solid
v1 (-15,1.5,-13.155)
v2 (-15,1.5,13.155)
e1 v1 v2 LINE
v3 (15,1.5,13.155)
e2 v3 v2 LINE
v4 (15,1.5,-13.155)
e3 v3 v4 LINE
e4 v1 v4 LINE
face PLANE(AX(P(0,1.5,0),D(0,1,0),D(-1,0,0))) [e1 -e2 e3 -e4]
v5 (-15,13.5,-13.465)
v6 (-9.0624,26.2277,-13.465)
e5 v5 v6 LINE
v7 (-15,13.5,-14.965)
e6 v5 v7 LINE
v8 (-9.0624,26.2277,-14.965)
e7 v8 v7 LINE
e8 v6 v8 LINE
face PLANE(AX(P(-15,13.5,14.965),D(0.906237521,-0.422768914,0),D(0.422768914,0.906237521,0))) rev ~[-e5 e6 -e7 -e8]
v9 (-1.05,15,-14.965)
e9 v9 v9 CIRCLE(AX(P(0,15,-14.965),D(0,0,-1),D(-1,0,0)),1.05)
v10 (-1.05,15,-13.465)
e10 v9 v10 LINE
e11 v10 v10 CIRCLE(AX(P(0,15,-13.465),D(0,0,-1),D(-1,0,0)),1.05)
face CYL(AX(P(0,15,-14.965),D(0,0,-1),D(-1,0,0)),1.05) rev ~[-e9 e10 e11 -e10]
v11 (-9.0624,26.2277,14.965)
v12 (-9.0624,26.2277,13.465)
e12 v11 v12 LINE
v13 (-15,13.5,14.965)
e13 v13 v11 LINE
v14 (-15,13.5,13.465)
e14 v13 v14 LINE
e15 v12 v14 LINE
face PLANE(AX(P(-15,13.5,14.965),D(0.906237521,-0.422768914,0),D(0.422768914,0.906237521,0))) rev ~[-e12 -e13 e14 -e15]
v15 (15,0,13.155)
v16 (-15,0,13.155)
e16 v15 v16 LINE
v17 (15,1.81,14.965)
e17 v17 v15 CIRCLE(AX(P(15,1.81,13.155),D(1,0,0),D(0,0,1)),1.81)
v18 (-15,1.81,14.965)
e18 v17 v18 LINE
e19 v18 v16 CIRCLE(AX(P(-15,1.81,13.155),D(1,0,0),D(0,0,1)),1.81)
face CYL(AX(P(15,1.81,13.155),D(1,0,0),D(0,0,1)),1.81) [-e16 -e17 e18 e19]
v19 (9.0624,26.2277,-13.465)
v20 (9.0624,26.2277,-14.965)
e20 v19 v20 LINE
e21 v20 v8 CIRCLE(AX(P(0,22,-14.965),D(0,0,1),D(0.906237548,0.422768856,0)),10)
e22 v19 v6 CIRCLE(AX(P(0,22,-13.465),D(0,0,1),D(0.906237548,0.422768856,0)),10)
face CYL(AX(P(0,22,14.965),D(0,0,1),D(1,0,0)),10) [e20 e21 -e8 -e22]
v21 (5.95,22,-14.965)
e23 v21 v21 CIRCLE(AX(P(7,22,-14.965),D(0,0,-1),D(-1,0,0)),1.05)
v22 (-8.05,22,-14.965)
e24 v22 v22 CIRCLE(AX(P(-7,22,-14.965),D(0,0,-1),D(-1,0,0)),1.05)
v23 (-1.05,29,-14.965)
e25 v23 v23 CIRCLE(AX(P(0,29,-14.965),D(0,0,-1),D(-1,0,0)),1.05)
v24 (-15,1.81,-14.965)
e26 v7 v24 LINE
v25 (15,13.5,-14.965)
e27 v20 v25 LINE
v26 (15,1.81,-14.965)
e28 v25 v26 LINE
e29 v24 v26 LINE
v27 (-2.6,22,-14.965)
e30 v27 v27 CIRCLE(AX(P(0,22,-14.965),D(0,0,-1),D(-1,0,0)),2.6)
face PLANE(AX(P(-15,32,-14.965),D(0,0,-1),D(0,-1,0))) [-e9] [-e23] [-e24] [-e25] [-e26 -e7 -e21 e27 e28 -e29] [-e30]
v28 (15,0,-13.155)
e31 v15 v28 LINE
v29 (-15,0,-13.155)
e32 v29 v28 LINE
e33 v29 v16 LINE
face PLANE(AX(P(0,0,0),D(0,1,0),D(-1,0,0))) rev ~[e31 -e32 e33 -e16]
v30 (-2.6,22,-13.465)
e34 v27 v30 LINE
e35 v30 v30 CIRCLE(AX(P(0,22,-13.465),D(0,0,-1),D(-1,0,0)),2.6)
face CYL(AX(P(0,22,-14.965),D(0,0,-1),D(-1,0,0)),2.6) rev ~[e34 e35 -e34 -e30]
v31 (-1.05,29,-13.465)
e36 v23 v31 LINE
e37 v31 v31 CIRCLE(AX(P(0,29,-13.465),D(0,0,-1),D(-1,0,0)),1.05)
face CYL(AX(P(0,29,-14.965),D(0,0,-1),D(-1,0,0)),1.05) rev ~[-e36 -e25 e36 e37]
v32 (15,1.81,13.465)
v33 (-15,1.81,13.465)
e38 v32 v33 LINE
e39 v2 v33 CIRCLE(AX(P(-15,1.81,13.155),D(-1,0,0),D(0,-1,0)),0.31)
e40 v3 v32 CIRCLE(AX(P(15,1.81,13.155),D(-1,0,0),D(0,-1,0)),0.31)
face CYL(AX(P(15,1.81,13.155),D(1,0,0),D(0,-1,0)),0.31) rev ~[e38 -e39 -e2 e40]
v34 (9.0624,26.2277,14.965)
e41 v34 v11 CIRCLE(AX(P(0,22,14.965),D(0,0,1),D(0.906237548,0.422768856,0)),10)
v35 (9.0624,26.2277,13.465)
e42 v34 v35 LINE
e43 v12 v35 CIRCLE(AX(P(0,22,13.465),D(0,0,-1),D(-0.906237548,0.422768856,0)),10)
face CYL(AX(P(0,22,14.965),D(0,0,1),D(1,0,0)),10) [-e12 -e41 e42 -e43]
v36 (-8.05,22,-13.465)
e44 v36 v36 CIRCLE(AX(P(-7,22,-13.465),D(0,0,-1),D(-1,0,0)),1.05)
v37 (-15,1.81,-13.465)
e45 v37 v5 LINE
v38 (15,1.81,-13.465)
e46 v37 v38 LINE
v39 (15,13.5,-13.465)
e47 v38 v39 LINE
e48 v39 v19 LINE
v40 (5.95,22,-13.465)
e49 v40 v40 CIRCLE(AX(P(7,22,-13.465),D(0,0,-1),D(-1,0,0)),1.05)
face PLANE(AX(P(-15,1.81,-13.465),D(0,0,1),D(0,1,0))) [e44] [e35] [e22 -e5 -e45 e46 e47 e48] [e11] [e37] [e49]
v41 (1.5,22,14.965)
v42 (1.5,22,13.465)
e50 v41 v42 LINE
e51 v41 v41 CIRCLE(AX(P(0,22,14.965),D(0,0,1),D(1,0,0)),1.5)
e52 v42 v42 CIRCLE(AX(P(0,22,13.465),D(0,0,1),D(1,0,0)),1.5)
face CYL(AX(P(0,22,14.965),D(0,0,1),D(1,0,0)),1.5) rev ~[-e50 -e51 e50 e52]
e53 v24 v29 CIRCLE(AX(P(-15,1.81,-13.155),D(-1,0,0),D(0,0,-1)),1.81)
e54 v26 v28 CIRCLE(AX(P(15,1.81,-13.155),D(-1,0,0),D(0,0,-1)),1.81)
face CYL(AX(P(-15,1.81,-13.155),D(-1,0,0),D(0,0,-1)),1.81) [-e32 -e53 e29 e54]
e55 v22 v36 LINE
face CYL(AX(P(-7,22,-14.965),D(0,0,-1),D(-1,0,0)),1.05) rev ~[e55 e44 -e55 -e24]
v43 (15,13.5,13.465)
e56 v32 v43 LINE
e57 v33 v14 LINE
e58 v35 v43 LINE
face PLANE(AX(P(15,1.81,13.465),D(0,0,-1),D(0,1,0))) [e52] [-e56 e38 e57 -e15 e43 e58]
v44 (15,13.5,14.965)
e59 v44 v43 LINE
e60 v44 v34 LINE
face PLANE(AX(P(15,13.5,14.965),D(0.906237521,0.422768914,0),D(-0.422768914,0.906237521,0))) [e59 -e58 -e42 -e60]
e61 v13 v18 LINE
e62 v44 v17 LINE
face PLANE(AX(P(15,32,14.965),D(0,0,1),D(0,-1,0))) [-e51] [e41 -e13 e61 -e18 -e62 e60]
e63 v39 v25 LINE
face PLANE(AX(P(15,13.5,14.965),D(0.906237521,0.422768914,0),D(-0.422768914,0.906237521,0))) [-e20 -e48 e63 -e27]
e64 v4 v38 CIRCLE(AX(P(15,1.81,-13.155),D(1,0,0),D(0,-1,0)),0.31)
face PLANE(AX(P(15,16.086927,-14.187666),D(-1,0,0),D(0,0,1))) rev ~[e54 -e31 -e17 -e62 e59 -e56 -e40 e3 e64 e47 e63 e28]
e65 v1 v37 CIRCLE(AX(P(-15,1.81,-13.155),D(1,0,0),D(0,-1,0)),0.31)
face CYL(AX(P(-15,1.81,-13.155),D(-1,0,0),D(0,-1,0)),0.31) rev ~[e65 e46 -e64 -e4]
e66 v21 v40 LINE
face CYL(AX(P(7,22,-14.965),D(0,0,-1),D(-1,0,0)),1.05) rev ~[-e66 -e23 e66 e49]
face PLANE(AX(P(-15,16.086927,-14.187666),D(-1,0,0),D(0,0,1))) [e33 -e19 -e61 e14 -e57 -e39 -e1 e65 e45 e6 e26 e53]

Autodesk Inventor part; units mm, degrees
ref_plane "YZ Plane" through (0, 0, 0) normal (1, 0, 0) x (0, 1, 0)
ref_plane "XZ Plane" through (0, 0, 0) normal (0, 1, 0) x (-1, 0, 0)
ref_plane "XY Plane" through (0, 0, 0) normal (0, 0, 1) x (1, 0, 0)
sketch "Sketch1" plane through (0, 0, 0) normal (0, 1, 0) x (-1, 0, 0)
  line L0 (15, 14.965) -> (-15, 14.965)
  line L1 (-15, 14.965) -> (-15, -14.965)
  line L2 (-15, -14.965) -> (15, -14.965)
  line L3 (15, -14.965) -> (15, 14.965)
  point P0 (0, 0)
  dimension "d0" = 29.93
  dimension "d1" = 30
  dimension "d2" = 15
  dimension "d3" = 14.965
extrude "Plate1" add sketch "Sketch1" along normal blind 1.5
sketch "Sketch2" plane through (-15, 0, -13.465) normal (0, 0, -1) x (-1, 0, 0)
  line L0 (-30, 0) -> (0, 0)
  line L1 (0, 0) -> (0, 32)
  line L2 (0, 32) -> (-30, 32)
  line L3 (-30, 32) -> (-30, 0)
edge flange "Flange1" height 32 angle 90 thickness 1.5 bend radius 0.31 thickness toward (0, 0, -1) relief tear relief width 1.5 relief depth 0.75 corner gap 0.31 corner form 0 edges at (0, 1.5, -14.965) (0, 1.5, 14.965) wall of the first edge with corners at (15, 0, -13.465) (-15, 0, -13.465) (-15, 32, -13.465) (15, 32, -13.465)
bend "Bend1"
corner "Corner1"
sketch "Sketch3" plane through (-15, 32, 14.965) normal (0, 0, 1) x (1, 0, 0)
  line L0 (0, 0) -> (30, 0) projected
  line L1 (0, -30.19) -> (0, 0) projected
  circle A0 centre (15, -10) radius 10
  line L2 (0, -18.5) -> (30, -18.5)
  line L3 (30, -18.5) -> (30, -28.5)
  line L4 (30, -28.5) -> (0, -28.5)
  line L5 (0, -28.5) -> (0, -18.5)
  line L6 (30, -18.5) -> (24.0624, -5.7723)
  line L7 (0, -18.5) -> (5.9376, -5.7723)
  line L8 (0, 0) -> (30, 0)
  line L9 (30, 0) -> (30, -25)
  line L10 (30, -25) -> (0, -25)
  line L11 (0, -25) -> (0, 0)
  point P0 (15, -32)
  point P1 (15, 0)
  dimension "d15" = 10
  dimension "d16" = 0
  dimension "d17" = 20
  dimension "d18" = 8.5
  dimension "d19" = 0
  dimension "d20" = 30
  dimension "d21" = 10
  dimension "d22" = 25
extrude "Extrusion1" cut sketch "Sketch3" against normal blind 35 contours L0 A0 L7 L1 | L0 L9 L6 A0
sketch "Sketch4" plane through (15, 1.81, -14.965) normal (0, 0, -1) x (-1, 0, 0)
  arc A0 (24.0624, 24.4177) -> (5.9376, 24.4177) centre (15, 20.19) ccw projected
  circle A1 centre (15, 20.19) radius 2.6
  circle A2 centre (8, 20.19) radius 1.05
  circle A3 centre (22, 20.19) radius 1.05
  circle A4 centre (15, 27.19) radius 1.05
  circle A5 centre (15, 13.19) radius 1.05
  point P0 (15, -1.81)
  dimension "d25" = 5.2
  dimension "d26" = 0
  dimension "d27" = 7
  dimension "d28" = 2.1
  dimension "d29" = 7
  dimension "d30" = 0
  dimension "d31" = 2.1
  dimension "d32" = 0
  dimension "d33" = 7
  dimension "d34" = 2.1
  dimension "d35" = 7
  dimension "d36" = 0
  dimension "d37" = 2.1
extrude "Extrusion2" cut sketch "Sketch4" against normal blind 1.5
sketch "Sketch5" plane through (-15, 1.81, 14.965) normal (0, 0, 1) x (1, 0, 0)
  arc A0 (24.0624, 24.4177) -> (5.9376, 24.4177) centre (15, 20.19) ccw projected
  circle A1 centre (15, 20.19) radius 1.5
  point P0 (15, -1.81)
  dimension "d40" = 3
extrude "Extrusion3" cut sketch "Sketch5" against normal blind 1.5
equation "\"d4\" = Thickness"
equation "\"d5\" = BendReliefWidth"
equation "\"d6\" = BendReliefDepth"
equation "\"d7\" = MinimumRemnant"
equation "\"d8\" = TransitionRadius"
equation "\"d11\" = BendRadius"
equation "\"d12\" = CornerReliefSize"
equation "\"d13\" = GapSize"
equation "\"d14\" = JacobiRadiusSize"
equation "\"BendReliefWidth\" = Thickness"
equation "\"BendReliefDepth\" = 0.5 * Thickness"
equation "\"CornerReliefSize\" = 4 * Thickness"
equation "\"MinimumRemnant\" = 2 * Thickness"
equation "\"TransitionRadius\" = BendRadius"
equation "\"JacobiRadiusSize\" = BendRadius"
equation "\"GapSize\" = Thickness"
equation "\"Thickness\" = 1.5"
equation "\"BendRadius\" = 0.31"
properties part number "partpart" material "Aluminum 6061-AHC"
